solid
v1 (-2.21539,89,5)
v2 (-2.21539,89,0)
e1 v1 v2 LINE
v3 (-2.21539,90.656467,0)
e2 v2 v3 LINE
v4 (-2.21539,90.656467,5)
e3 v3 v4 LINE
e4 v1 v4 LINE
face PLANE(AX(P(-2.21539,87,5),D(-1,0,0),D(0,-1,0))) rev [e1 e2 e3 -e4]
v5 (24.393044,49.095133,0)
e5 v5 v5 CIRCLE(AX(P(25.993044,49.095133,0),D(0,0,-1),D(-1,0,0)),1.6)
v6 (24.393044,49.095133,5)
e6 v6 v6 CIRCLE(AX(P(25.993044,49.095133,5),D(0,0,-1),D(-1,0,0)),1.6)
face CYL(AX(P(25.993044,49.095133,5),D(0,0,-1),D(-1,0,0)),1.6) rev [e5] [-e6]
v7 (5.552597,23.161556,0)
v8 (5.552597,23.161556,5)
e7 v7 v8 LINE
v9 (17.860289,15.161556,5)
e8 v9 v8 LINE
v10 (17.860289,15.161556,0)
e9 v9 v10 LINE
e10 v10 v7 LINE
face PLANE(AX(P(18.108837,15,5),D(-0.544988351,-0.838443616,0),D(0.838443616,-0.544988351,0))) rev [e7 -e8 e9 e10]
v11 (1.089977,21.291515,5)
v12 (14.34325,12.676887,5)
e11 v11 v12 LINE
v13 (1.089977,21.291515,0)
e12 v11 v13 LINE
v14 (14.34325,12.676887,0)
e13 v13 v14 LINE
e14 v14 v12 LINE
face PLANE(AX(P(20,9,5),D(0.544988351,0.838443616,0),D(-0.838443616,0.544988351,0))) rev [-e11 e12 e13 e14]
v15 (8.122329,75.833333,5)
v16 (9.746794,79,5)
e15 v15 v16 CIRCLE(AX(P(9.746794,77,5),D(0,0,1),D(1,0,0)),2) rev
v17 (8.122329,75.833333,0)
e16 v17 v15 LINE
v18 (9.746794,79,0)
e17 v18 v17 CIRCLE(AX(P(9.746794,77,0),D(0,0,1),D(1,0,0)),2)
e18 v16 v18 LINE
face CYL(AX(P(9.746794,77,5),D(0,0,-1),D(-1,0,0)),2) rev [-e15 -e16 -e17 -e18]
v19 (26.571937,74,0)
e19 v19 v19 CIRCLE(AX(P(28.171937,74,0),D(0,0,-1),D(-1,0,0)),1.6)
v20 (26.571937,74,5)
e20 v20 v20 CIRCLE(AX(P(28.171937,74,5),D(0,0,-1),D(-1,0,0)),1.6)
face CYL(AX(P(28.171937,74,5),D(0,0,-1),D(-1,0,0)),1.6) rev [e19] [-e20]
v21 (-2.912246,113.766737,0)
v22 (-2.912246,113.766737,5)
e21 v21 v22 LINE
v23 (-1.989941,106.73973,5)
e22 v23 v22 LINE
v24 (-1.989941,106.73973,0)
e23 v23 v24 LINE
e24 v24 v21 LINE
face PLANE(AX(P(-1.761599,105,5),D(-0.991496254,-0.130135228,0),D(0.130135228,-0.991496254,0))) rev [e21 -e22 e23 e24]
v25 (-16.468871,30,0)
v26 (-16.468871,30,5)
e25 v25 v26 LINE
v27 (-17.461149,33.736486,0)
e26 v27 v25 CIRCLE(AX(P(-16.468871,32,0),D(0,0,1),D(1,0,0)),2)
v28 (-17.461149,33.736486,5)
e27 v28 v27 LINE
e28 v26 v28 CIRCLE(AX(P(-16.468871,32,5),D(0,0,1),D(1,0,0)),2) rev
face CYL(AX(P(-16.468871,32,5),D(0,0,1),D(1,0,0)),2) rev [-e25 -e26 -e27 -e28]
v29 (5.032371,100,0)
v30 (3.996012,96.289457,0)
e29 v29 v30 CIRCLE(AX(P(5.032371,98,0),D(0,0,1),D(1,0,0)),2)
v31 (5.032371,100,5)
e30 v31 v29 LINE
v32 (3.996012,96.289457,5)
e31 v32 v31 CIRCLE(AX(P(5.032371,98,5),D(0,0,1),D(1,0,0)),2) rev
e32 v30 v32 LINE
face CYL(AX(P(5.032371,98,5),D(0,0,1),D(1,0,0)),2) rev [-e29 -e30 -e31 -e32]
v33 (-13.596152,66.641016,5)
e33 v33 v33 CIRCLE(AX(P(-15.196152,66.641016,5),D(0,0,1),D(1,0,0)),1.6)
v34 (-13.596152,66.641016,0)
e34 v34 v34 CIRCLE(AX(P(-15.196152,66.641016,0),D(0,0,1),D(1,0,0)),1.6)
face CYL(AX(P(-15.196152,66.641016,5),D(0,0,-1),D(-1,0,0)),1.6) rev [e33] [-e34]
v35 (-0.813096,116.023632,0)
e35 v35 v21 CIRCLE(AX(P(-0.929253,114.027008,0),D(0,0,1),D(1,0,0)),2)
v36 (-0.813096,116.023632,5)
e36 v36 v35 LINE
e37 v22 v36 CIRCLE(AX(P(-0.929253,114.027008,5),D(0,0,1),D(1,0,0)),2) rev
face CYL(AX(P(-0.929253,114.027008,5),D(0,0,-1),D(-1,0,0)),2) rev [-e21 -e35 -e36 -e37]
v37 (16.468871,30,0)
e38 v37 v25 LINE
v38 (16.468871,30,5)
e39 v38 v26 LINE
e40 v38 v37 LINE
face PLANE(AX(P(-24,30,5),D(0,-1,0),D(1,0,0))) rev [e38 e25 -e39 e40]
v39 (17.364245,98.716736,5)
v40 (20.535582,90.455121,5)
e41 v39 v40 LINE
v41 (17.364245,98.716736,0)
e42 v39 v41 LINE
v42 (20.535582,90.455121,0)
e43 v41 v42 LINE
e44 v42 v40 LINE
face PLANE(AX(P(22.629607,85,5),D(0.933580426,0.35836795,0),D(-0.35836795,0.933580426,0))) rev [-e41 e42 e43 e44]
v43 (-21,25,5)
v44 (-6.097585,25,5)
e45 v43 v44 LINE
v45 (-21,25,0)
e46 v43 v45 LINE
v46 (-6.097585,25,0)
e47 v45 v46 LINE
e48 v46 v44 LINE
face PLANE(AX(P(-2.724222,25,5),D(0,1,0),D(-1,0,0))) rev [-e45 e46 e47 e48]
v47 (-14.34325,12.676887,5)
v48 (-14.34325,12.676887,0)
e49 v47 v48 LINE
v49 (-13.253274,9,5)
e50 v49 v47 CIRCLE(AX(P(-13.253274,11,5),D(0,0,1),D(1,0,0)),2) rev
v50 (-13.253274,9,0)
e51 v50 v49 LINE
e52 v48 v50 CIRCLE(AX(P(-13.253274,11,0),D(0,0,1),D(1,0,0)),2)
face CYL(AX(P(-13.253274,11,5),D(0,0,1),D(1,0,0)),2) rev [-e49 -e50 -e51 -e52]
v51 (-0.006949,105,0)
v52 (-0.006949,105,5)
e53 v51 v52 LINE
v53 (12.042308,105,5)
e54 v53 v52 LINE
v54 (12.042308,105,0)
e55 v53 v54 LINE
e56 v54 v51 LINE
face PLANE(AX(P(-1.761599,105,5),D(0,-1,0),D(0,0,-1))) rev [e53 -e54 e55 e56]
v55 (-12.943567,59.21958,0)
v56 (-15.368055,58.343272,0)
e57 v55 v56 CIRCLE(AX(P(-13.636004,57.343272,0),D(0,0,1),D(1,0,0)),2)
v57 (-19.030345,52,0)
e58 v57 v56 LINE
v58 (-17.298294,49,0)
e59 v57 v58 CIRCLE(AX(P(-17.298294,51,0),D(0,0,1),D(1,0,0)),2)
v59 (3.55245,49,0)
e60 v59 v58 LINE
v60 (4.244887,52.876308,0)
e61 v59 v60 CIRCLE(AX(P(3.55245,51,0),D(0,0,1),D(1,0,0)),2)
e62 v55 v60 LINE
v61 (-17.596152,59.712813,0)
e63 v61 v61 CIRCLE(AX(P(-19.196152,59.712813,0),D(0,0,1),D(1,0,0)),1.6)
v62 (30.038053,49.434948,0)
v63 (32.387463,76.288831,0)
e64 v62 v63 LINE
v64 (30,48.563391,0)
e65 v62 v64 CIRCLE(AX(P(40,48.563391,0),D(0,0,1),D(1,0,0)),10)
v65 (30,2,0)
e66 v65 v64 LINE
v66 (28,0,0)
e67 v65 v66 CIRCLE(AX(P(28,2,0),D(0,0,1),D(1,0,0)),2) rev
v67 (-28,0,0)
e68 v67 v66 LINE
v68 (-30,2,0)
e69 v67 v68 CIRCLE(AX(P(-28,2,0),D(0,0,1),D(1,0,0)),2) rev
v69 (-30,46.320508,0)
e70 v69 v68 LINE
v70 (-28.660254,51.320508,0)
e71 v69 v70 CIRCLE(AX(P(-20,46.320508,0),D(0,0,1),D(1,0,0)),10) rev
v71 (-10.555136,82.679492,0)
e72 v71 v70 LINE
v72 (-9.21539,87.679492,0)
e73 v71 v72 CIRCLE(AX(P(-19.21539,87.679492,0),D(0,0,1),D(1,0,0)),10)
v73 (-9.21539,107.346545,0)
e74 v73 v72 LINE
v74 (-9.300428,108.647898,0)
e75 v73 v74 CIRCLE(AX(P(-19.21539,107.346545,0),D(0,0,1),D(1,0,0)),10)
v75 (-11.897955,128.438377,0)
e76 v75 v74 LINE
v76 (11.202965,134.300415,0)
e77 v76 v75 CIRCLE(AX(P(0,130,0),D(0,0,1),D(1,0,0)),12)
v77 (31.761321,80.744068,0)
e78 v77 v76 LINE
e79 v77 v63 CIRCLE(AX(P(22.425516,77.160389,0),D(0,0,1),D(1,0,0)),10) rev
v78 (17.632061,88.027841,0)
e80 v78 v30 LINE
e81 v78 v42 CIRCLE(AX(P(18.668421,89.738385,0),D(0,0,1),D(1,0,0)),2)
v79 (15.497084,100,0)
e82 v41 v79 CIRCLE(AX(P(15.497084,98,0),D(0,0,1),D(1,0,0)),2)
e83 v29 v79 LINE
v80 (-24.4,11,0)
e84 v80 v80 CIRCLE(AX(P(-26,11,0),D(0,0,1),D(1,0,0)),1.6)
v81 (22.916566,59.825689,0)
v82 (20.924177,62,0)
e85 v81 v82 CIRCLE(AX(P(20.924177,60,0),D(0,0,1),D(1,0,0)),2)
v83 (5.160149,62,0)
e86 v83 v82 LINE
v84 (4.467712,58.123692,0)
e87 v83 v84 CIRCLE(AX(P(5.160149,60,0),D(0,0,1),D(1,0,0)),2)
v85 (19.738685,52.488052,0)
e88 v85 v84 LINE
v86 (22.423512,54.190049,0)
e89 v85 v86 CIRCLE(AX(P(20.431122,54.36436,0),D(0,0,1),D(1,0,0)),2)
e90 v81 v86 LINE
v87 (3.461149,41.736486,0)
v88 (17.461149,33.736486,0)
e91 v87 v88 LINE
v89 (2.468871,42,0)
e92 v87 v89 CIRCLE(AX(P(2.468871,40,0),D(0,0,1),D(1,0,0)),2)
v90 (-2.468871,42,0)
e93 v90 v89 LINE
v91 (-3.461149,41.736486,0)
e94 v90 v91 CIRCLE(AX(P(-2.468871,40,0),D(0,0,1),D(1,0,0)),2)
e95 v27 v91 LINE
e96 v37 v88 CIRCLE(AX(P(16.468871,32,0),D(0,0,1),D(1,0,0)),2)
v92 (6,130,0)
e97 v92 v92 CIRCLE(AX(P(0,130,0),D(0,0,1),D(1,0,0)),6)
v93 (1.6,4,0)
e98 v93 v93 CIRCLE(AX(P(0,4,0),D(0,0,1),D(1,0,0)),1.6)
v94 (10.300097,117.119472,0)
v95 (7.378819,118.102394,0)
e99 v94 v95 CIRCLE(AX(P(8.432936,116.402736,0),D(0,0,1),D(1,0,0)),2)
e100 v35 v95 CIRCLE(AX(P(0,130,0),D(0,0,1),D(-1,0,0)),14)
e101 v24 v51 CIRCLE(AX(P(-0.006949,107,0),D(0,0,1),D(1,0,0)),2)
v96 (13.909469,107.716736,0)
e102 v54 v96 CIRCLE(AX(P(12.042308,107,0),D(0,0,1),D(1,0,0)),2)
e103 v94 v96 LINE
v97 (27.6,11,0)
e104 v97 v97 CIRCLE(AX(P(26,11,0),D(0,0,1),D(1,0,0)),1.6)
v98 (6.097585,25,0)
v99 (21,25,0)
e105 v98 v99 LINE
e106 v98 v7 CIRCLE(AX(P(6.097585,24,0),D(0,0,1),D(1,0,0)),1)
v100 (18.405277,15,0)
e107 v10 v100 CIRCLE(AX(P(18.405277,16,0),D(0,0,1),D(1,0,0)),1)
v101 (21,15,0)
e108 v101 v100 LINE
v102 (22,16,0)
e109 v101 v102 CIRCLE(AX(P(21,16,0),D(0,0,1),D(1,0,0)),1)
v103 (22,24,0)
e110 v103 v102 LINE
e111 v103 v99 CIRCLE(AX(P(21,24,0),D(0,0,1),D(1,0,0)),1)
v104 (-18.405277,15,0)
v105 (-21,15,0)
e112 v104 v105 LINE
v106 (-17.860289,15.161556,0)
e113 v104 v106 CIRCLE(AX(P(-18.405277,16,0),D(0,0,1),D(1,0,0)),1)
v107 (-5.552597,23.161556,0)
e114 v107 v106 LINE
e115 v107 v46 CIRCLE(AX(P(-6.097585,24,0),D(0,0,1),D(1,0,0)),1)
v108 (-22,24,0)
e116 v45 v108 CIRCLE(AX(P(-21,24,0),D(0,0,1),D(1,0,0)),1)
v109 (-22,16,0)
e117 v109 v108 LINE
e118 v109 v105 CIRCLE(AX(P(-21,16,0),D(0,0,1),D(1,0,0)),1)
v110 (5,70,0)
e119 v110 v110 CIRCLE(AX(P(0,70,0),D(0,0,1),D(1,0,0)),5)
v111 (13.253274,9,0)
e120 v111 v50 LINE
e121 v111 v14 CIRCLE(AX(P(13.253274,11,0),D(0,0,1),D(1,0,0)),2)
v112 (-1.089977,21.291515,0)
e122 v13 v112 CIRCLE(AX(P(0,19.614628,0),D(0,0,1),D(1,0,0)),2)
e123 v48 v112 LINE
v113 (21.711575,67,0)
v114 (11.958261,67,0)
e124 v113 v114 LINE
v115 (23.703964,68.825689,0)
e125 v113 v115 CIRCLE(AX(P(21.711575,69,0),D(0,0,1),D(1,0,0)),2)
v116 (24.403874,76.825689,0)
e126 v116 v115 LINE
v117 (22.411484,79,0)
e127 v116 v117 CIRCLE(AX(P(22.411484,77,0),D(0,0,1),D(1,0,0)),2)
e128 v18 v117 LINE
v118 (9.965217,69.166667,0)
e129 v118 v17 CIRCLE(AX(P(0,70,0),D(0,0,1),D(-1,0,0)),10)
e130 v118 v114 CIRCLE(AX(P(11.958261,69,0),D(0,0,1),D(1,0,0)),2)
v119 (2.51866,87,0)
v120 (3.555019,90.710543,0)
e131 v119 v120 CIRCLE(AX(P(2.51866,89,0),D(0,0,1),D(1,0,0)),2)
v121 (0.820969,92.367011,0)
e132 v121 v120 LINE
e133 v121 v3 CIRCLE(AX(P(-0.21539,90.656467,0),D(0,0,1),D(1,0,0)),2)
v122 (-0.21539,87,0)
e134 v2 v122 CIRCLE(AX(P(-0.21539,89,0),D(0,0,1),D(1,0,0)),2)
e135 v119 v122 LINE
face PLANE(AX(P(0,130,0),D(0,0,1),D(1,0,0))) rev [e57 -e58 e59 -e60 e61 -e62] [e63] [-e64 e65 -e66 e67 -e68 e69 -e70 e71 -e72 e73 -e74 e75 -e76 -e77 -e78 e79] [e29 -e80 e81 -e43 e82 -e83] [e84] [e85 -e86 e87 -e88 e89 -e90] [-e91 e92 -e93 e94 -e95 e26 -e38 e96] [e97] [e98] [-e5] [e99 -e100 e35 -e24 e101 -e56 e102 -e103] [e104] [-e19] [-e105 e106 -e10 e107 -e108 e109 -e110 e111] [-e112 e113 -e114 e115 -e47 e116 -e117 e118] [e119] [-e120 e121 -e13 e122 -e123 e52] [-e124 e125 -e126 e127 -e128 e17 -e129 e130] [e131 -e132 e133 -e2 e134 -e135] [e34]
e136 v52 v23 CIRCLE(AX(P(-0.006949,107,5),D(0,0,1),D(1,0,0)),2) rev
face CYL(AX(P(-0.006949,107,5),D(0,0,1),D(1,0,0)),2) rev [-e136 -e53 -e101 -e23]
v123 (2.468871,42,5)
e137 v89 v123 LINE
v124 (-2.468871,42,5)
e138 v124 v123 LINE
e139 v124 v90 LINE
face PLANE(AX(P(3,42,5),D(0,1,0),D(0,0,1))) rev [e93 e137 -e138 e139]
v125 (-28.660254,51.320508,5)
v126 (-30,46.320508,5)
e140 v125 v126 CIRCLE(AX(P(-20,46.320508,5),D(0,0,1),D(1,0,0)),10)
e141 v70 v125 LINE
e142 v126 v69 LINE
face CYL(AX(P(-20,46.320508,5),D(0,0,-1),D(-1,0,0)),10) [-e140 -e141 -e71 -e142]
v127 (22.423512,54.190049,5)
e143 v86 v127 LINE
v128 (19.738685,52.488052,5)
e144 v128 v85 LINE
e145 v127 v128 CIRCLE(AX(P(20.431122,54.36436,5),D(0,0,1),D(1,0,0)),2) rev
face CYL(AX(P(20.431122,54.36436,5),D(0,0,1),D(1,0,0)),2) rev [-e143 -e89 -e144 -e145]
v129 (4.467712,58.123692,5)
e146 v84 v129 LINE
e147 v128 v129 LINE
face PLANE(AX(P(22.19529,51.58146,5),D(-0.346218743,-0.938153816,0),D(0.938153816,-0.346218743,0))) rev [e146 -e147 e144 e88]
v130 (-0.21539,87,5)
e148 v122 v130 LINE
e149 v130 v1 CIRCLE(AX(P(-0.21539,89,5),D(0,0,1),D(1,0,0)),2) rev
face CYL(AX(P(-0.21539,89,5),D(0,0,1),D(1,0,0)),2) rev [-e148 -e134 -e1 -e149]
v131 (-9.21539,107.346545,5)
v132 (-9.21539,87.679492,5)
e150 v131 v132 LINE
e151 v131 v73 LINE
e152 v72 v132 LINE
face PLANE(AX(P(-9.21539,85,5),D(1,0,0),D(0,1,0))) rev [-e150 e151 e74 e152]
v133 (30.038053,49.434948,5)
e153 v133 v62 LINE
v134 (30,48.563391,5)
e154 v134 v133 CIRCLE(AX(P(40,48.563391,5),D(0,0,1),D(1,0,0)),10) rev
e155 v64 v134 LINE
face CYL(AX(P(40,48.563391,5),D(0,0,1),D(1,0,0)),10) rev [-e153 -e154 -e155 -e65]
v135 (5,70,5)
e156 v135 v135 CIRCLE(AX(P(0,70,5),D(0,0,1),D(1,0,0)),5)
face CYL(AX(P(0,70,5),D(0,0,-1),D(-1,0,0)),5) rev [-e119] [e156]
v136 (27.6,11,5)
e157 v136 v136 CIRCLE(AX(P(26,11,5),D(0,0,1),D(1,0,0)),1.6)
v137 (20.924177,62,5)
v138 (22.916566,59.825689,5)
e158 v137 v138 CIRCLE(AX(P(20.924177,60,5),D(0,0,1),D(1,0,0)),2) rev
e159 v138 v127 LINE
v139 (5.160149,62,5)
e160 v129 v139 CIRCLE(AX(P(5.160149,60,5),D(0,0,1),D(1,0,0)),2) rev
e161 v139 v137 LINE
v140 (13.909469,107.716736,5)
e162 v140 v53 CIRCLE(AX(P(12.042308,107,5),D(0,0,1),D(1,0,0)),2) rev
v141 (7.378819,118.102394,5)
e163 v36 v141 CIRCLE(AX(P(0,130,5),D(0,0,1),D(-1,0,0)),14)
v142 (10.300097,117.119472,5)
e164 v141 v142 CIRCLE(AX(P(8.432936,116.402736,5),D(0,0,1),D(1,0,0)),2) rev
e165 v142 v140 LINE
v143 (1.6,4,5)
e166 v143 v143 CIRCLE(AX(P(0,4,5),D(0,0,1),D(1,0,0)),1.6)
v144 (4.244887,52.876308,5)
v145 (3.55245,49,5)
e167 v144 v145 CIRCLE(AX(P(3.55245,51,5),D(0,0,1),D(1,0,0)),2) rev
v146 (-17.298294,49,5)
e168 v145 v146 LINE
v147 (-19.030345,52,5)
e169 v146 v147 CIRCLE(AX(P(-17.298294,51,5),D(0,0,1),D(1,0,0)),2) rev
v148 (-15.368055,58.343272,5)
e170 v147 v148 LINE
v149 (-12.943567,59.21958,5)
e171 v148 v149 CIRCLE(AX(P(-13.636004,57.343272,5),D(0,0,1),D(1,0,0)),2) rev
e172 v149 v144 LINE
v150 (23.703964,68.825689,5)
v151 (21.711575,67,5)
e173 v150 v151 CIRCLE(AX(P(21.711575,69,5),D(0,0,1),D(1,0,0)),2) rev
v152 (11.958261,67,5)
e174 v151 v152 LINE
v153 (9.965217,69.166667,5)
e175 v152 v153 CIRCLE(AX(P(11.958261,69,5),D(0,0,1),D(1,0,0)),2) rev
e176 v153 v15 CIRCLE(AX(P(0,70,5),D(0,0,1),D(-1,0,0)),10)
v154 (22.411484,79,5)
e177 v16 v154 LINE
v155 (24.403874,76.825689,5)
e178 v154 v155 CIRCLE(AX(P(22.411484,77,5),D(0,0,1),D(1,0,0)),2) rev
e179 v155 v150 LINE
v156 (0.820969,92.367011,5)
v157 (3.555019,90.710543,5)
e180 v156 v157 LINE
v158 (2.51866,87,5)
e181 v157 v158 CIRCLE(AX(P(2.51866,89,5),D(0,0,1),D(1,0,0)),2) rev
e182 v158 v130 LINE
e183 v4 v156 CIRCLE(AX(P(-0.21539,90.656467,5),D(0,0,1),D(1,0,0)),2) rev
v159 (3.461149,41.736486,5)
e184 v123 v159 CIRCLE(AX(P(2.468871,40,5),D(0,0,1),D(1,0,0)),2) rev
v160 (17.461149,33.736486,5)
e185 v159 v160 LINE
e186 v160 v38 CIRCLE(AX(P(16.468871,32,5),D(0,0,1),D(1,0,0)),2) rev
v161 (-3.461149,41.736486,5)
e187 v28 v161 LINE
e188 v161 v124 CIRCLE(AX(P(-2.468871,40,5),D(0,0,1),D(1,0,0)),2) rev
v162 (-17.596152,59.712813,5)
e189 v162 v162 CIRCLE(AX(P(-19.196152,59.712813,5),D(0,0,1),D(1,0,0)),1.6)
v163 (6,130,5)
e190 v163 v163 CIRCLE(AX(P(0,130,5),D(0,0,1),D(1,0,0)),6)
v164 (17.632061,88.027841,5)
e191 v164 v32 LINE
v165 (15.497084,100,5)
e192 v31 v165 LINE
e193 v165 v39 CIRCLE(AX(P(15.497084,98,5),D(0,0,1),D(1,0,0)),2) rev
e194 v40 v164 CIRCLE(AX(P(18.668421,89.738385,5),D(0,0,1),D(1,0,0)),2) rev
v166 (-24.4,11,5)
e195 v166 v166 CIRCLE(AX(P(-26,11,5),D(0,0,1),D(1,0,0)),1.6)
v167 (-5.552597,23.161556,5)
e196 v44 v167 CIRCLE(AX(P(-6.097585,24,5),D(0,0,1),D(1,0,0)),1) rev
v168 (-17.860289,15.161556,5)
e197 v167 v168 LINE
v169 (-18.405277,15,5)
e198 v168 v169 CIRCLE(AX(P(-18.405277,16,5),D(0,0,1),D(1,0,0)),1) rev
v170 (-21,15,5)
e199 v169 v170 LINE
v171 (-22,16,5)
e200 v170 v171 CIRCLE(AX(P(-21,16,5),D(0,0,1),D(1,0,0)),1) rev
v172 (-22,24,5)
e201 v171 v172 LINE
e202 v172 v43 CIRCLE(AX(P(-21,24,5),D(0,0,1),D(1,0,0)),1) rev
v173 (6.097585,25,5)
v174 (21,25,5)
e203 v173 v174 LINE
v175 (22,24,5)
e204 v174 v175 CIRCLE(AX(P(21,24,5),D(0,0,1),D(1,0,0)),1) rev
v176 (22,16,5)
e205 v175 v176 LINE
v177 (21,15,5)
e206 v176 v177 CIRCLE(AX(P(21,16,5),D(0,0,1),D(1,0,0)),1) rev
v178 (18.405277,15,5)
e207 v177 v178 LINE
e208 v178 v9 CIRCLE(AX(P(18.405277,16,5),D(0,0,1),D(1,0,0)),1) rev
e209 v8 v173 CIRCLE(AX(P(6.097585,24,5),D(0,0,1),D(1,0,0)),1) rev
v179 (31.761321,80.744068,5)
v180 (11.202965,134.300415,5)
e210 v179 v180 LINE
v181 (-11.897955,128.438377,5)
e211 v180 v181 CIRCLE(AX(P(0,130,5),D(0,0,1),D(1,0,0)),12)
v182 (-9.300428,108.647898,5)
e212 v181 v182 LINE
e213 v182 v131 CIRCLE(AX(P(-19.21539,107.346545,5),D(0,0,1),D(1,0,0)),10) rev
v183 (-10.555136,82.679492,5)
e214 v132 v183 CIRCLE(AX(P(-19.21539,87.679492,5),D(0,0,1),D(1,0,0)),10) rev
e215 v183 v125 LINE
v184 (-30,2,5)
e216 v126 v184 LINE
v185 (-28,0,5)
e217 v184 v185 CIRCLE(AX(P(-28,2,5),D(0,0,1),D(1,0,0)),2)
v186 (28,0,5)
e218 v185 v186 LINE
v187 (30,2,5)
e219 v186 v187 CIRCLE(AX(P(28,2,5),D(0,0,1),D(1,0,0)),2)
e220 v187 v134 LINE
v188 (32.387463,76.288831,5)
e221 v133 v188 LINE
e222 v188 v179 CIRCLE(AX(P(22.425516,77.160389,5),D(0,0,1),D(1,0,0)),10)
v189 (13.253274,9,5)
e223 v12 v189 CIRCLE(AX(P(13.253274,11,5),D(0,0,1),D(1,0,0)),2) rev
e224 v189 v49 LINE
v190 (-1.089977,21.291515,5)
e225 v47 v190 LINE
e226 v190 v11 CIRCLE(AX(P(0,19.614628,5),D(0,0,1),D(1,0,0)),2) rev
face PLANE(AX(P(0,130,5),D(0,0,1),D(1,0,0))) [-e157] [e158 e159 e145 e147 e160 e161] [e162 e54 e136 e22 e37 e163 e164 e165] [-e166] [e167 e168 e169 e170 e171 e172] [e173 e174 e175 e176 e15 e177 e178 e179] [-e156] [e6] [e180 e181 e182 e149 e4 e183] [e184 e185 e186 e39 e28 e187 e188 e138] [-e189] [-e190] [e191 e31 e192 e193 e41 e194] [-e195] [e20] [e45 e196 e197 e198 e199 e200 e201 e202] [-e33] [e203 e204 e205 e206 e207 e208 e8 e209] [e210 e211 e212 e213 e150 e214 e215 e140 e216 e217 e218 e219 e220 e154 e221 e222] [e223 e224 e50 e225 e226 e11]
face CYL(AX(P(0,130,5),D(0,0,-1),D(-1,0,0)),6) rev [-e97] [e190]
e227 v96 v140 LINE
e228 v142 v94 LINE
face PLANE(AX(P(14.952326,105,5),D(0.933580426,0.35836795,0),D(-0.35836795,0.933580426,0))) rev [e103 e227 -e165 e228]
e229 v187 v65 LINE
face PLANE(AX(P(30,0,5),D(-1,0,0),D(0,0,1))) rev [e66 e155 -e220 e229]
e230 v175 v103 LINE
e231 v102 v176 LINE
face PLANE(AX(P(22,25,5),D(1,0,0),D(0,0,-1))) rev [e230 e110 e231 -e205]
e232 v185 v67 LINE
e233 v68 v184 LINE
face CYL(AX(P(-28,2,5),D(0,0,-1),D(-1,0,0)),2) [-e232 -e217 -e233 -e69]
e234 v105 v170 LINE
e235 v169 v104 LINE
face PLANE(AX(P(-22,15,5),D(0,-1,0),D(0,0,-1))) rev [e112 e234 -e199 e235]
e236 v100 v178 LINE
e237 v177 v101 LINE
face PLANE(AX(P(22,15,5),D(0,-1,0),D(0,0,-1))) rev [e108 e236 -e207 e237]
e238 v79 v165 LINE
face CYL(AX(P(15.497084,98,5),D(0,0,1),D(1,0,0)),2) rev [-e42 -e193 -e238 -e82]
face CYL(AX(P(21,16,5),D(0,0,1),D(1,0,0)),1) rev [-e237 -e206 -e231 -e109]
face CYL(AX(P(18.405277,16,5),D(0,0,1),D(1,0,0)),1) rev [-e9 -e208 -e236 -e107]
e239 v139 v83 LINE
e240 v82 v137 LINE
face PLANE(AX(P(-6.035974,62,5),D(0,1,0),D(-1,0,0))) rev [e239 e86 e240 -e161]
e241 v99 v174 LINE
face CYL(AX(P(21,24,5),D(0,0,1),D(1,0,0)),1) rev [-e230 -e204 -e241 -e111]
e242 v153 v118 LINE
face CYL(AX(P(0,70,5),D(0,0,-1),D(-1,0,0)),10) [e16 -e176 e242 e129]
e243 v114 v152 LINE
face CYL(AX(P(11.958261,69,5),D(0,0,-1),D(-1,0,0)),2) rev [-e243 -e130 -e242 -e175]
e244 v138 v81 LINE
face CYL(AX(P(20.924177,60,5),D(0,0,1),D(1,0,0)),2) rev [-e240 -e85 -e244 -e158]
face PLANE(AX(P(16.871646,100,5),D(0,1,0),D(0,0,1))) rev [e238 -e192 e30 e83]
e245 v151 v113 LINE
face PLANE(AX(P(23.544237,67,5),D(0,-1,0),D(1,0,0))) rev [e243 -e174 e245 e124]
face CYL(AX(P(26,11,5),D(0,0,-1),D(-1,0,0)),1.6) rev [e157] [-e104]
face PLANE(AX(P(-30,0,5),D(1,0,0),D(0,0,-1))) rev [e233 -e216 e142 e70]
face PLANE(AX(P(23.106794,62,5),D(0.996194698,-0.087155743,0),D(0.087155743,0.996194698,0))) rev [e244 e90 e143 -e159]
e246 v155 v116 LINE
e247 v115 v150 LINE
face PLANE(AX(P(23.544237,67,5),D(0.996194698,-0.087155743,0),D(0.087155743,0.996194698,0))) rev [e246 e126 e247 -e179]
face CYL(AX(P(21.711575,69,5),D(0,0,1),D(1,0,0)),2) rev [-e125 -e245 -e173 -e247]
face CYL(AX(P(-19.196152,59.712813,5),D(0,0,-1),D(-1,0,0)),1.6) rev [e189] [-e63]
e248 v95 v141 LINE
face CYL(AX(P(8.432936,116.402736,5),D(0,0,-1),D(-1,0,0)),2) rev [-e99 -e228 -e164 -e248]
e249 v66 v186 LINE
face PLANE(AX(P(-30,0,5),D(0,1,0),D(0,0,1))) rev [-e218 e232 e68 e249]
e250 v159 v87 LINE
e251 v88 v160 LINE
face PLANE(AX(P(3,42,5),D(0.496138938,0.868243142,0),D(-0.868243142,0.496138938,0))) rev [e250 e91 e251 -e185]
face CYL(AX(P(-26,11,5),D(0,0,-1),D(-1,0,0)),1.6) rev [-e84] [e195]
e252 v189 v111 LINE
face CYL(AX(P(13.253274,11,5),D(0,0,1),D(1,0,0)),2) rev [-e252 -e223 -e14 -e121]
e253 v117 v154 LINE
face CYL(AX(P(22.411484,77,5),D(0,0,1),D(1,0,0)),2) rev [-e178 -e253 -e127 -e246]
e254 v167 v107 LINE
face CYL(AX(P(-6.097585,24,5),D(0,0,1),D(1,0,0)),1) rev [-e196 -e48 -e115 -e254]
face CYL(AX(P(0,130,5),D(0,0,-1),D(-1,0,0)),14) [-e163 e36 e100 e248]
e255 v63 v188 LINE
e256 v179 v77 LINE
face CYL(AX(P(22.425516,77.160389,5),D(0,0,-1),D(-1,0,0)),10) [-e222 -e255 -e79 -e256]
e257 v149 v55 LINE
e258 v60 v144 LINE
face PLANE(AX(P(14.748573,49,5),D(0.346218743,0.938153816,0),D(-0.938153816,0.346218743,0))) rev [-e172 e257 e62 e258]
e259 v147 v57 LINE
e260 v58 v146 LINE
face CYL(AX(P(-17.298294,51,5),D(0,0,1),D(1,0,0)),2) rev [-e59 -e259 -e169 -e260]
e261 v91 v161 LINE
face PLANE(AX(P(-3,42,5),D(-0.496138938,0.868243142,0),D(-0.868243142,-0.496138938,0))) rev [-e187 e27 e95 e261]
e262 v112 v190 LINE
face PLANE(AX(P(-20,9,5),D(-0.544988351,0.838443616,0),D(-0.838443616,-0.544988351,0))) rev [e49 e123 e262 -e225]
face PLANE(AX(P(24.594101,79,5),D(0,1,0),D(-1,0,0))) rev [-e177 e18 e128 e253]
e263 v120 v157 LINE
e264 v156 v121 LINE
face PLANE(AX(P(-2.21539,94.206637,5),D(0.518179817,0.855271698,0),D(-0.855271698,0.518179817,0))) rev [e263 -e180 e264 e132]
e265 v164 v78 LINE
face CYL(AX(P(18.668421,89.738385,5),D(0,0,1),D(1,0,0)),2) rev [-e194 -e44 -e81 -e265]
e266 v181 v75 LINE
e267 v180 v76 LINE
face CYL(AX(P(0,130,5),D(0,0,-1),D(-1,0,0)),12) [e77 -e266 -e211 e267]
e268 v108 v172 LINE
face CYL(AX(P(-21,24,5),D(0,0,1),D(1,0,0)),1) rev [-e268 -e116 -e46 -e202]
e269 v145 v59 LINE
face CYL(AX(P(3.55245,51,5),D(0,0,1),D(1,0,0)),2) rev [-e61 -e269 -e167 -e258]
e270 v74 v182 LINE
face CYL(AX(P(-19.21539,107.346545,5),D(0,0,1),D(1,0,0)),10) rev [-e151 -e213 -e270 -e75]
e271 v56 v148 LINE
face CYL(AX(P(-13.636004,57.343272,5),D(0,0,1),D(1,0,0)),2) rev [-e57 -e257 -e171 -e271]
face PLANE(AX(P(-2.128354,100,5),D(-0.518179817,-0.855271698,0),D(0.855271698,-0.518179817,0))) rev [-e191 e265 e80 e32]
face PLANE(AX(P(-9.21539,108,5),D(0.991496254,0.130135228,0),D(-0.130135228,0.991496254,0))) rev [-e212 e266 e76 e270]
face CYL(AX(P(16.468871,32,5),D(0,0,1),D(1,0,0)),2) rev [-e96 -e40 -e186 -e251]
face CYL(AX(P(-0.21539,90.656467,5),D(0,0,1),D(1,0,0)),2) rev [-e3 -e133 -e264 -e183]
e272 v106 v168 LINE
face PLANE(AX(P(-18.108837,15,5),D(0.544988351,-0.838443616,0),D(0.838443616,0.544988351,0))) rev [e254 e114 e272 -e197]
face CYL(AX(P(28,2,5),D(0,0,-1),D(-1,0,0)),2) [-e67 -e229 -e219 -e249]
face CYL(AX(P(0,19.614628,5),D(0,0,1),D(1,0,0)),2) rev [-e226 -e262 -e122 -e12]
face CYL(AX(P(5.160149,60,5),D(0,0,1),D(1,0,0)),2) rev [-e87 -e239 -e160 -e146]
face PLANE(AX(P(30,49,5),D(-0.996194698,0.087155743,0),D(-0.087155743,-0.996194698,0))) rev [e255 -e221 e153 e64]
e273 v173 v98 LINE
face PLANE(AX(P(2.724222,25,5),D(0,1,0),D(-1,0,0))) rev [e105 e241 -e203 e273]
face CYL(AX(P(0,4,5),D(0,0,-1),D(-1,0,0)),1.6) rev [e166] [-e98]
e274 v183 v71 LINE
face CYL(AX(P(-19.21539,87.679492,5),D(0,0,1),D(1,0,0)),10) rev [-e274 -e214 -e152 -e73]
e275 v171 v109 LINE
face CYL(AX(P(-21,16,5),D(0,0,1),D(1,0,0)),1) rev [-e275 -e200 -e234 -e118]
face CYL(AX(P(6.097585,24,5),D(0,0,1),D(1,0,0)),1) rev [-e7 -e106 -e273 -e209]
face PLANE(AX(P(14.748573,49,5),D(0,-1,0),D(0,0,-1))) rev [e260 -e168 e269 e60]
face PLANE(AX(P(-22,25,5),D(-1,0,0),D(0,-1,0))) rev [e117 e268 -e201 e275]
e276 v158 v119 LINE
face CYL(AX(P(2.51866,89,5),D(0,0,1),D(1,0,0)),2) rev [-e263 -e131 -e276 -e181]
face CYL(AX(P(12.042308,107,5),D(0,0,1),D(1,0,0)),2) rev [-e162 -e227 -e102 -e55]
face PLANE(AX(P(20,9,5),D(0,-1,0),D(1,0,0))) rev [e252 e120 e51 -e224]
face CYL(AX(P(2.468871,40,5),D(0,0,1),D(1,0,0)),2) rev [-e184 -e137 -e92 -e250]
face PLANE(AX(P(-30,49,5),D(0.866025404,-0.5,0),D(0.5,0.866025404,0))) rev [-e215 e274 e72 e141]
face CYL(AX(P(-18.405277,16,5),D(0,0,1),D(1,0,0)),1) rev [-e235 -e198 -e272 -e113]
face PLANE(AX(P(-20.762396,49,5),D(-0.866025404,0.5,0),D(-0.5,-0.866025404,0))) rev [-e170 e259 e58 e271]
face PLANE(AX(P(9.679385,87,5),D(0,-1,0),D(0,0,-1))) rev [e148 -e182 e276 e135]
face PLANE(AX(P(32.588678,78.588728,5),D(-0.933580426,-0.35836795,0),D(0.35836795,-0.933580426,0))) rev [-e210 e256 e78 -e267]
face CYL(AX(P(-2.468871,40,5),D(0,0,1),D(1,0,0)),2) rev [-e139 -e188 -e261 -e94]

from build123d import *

# Parameters (mm, degrees)
SKETCH_1_R          = 6
SKETCH_1_R_2        = 1.6
SKETCH_1_R_3        = 5
EXTRUDE_1_DEPTH     = 5
FILLET_1_R          = 2
FILLET_2_R          = 10
CUT_EXTRUDE_1_DEPTH = 146.740914343
FILLET_3_R          = 2
FILLET_4_R          = 1
FILLET_5_R          = 2
FILLET_7_R          = 2
SKETCH_4_R          = 1.6
CUT_EXTRUDE_2_DEPTH = 146.740914343


with BuildPart() as part:
    # 草图1 → 凸台-拉伸1 (new body)
    with BuildSketch(Plane.XY):
        with BuildLine():
            Line((-30, 0), (30, 0))
            Line((30, 0), (30, 49))
            Line((30, 49), (32.588678263, 78.58872794))
            Line((32.588678263, 78.58872794), (11.202965118, 134.300415395))
            ThreePointArc((11.202965118, 134.300415395), (-2.951546295, 141.63135308), (-11.897955052, 128.438377258))
            Line((-11.897955052, 128.438377258), (-9.215390309, 108))
            Line((-9.215390309, 108), (-9.215390309, 85))
            Line((-9.215390309, 85), (-30, 49))
            Line((-30, 49), (-30, 0))
        make_face()
        with Locations((0, 130)):
            Circle(SKETCH_1_R, mode=Mode.SUBTRACT)
        with Locations((0, 4)):
            Circle(SKETCH_1_R_2, mode=Mode.SUBTRACT)
        with Locations((26, 11)):
            Circle(SKETCH_1_R_2, mode=Mode.SUBTRACT)
        with Locations((-26, 11)):
            Circle(SKETCH_1_R_2, mode=Mode.SUBTRACT)
        with Locations((0, 70)):
            Circle(SKETCH_1_R_3, mode=Mode.SUBTRACT)
        with Locations((-15.196152423, 66.641016151)):
            Circle(SKETCH_1_R_2, mode=Mode.SUBTRACT)
        with Locations((-19.196152423, 59.712812921)):
            Circle(SKETCH_1_R_2, mode=Mode.SUBTRACT)
    extrude(amount=EXTRUDE_1_DEPTH)

    # 圆角1
    fillet_1_edges = [part.edges().sort_by_distance(p)[0] for p in [
        (30, 0, 2.5),
        (-30, 0, 2.5),
    ]]
    fillet(fillet_1_edges, radius=FILLET_1_R)

    # 圆角2
    # the kernel refuses this fillet: 10 mm, written as the material it adds along each edge
    with BuildSketch(Plane(origin=(-9.215390309, 85, 0), x_dir=(-0.5000000000000011, -0.8660254037844379, 0), z_dir=(0, 0, 1))) as fillet_2_piece_1:
        with BuildLine():
            CenterArc((FILLET_2_R * 0.267949192431, -FILLET_2_R), FILLET_2_R, 90, 30)
            Line((-FILLET_2_R * 0.232050807569, -FILLET_2_R * 0.133974596216), (0, 0))
            Line((0, 0), (FILLET_2_R * 0.267949192431, 0))
        make_face()
    extrude(amount=5)
    with BuildSketch(Plane(origin=(-9.215390309, 108, 0), x_dir=(0, -1, 0), z_dir=(0, 0, 1))) as fillet_2_piece_2:
        with BuildLine():
            CenterArc((FILLET_2_R * 0.0653454548024, -FILLET_2_R), FILLET_2_R, 90, 7.47740672)
            Line((-FILLET_2_R * 0.0647897736728, -FILLET_2_R * 0.00850374569053), (0, 0))
            Line((0, 0), (FILLET_2_R * 0.0653454548024, 0))
        make_face()
    extrude(amount=5)
    with BuildSketch(Plane(origin=(30, 49, 0), x_dir=(0, -1, 0), z_dir=(0, 0, 1))) as fillet_2_piece_3:
        with BuildLine():
            CenterArc((FILLET_2_R * 0.0436609429085, FILLET_2_R), FILLET_2_R, 265, 5)
            Line((-FILLET_2_R * 0.0434947998391, FILLET_2_R * 0.00380530190825), (0, 0))
            Line((0, 0), (FILLET_2_R * 0.0436609429085, 0))
        make_face()
    extrude(amount=5)
    # the kernel refuses this fillet: 10 mm, written as the material it takes off along each edge
    with BuildSketch(Plane(origin=(-30, 49, -6.698729811), x_dir=(0, -1, 0), z_dir=(0, 0, 1))) as fillet_2_2_piece_1:
        with BuildLine():
            CenterArc((FILLET_2_R * 0.267949192431, FILLET_2_R), FILLET_2_R, 240, 30)
            Line((-FILLET_2_R * 0.232050807569, FILLET_2_R * 0.133974596216), (0, 0))
            Line((0, 0), (FILLET_2_R * 0.267949192431, 0))
        make_face()
    extrude(amount=18.397459622, mode=Mode.SUBTRACT)
    with BuildSketch(Plane(origin=(32.588678263, 78.58872794, -5.771704778), x_dir=(-0.08715574274765964, -0.9961946980917453, 0), z_dir=(0, 0, 1))) as fillet_2_2_piece_2:
        with BuildLine():
            CenterArc((FILLET_2_R * 0.230868191126, -FILLET_2_R), FILLET_2_R, 90, 26)
            Line((-FILLET_2_R * 0.207502955664, -FILLET_2_R * 0.101205953701), (0, 0))
            Line((0, 0), (FILLET_2_R * 0.230868191126, 0))
        make_face()
    extrude(amount=16.543409556, mode=Mode.SUBTRACT)

    # 草图3 → 切除-拉伸1 (cut, through all)
    with BuildSketch(Plane(origin=(0, 0, 0), x_dir=(-1, 0, 0), z_dir=(0, 0, -1))):
        Polygon((-20, 9), (20, 9), (0, 22), align=None)
        Polygon((-22, 15), (-18.108837195, 15), (-2.72422181, 25), (-22, 25), align=None)
        Polygon((22, 25), (22, 15), (18.108837195, 15), (2.72422181, 25), align=None)
        Polygon((-24, 30), (-3, 30), (3, 30), (24, 30), (3, 42), (-3, 42), align=None)
        Polygon((-14.748572851, 49), (20.762395693, 49), (14.525138112, 59.80324703), align=None)
        Polygon((6.035973745, 62), (-23.106793925, 62), (-22.195289828, 51.581460488), align=None)
        with BuildLine():
            Line((-23.544237243, 67), (-9.539392014, 67))
            ThreePointArc((-9.539392014, 67), (-9.180992478, 73.96350566), (-4.358898944, 79))
            Line((-4.358898944, 79), (-24.594101205, 79))
            Line((-24.594101205, 79), (-23.544237243, 67))
        make_face()
        with BuildLine():
            Line((1.761599482, 105), (-14.952325844, 105))
            Line((-14.952325844, 105), (-9.354171163, 119.583691543))
            ThreePointArc((-9.354171163, 119.583691543), (-3.443470677, 116.430088073), (3.255742342, 116.383827931))
            Line((3.255742342, 116.383827931), (1.761599482, 105))
        make_face()
        Polygon((-16.871646019, 100), (2.128353981, 100), (-22.629606545, 85), align=None)
        Polygon((2.215390309, 94.206636856), (-9.679385078, 87), (2.215390309, 87), align=None)
    extrude(amount=-CUT_EXTRUDE_1_DEPTH, mode=Mode.SUBTRACT)

    # 圆角3
    fillet_3_edges = [part.edges().sort_by_distance(p)[0] for p in [
        (20, 9, 2.5),
        (0, 22, 2.5),
        (-20, 9, 2.5),
    ]]
    fillet(fillet_3_edges, radius=FILLET_3_R)

    # 圆角4
    fillet_4_edges = [part.edges().sort_by_distance(p)[0] for p in [
        (-2.72422181, 25, 2.5),
        (-22, 25, 2.5),
        (-22, 15, 2.5),
        (-18.108837195, 15, 2.5),
        (22, 15, 2.5),
        (22, 25, 2.5),
        (2.72422181, 25, 2.5),
        (18.108837195, 15, 2.5),
    ]]
    fillet(fillet_4_edges, radius=FILLET_4_R)

    # 圆角5
    fillet_5_edges = [part.edges().sort_by_distance(p)[0] for p in [
        (23.544237243, 67, 2.5),
        (24.594101205, 79, 2.5),
        (4.358898944, 79, 2.5),
        (9.539392014, 67, 2.5),
        (22.195289828, 51.581460488, 2.5),
        (23.106793925, 62, 2.5),
        (-6.035973745, 62, 2.5),
        (-14.525138112, 59.80324703, 2.5),
        (-20.762395693, 49, 2.5),
        (14.748572851, 49, 2.5),
        (24, 30, 2.5),
        (3, 42, 2.5),
        (-3, 42, 2.5),
        (-24, 30, 2.5),
    ]]
    fillet(fillet_5_edges, radius=FILLET_5_R)

    # 圆角7
    fillet_7_edges = [part.edges().sort_by_distance(p)[0] for p in [
        (-3.255742342, 116.383827931, 2.5),
        (-1.761599482, 105, 2.5),
        (14.952325844, 105, 2.5),
        (9.354171163, 119.583691543, 2.5),
        (22.629606545, 85, 2.5),
        (16.871646019, 100, 2.5),
        (-2.128353981, 100, 2.5),
        (-2.215390309, 94.206636856, 2.5),
        (-2.215390309, 87, 2.5),
        (9.679385078, 87, 2.5),
    ]]
    fillet(fillet_7_edges, radius=FILLET_7_R)

    # 草图4 → 切除-拉伸2 (cut, through all)
    with BuildSketch(Plane(origin=(0, 0, 0), x_dir=(-1, 0, 0), z_dir=(0, 0, -1))):
        with Locations((-25.993043669, 49.095132548)):
            Circle(SKETCH_4_R)
        with Locations((-28.171937238, 74)):
            Circle(SKETCH_4_R)
    extrude(amount=-CUT_EXTRUDE_2_DEPTH, mode=Mode.SUBTRACT)


solid = part.part
